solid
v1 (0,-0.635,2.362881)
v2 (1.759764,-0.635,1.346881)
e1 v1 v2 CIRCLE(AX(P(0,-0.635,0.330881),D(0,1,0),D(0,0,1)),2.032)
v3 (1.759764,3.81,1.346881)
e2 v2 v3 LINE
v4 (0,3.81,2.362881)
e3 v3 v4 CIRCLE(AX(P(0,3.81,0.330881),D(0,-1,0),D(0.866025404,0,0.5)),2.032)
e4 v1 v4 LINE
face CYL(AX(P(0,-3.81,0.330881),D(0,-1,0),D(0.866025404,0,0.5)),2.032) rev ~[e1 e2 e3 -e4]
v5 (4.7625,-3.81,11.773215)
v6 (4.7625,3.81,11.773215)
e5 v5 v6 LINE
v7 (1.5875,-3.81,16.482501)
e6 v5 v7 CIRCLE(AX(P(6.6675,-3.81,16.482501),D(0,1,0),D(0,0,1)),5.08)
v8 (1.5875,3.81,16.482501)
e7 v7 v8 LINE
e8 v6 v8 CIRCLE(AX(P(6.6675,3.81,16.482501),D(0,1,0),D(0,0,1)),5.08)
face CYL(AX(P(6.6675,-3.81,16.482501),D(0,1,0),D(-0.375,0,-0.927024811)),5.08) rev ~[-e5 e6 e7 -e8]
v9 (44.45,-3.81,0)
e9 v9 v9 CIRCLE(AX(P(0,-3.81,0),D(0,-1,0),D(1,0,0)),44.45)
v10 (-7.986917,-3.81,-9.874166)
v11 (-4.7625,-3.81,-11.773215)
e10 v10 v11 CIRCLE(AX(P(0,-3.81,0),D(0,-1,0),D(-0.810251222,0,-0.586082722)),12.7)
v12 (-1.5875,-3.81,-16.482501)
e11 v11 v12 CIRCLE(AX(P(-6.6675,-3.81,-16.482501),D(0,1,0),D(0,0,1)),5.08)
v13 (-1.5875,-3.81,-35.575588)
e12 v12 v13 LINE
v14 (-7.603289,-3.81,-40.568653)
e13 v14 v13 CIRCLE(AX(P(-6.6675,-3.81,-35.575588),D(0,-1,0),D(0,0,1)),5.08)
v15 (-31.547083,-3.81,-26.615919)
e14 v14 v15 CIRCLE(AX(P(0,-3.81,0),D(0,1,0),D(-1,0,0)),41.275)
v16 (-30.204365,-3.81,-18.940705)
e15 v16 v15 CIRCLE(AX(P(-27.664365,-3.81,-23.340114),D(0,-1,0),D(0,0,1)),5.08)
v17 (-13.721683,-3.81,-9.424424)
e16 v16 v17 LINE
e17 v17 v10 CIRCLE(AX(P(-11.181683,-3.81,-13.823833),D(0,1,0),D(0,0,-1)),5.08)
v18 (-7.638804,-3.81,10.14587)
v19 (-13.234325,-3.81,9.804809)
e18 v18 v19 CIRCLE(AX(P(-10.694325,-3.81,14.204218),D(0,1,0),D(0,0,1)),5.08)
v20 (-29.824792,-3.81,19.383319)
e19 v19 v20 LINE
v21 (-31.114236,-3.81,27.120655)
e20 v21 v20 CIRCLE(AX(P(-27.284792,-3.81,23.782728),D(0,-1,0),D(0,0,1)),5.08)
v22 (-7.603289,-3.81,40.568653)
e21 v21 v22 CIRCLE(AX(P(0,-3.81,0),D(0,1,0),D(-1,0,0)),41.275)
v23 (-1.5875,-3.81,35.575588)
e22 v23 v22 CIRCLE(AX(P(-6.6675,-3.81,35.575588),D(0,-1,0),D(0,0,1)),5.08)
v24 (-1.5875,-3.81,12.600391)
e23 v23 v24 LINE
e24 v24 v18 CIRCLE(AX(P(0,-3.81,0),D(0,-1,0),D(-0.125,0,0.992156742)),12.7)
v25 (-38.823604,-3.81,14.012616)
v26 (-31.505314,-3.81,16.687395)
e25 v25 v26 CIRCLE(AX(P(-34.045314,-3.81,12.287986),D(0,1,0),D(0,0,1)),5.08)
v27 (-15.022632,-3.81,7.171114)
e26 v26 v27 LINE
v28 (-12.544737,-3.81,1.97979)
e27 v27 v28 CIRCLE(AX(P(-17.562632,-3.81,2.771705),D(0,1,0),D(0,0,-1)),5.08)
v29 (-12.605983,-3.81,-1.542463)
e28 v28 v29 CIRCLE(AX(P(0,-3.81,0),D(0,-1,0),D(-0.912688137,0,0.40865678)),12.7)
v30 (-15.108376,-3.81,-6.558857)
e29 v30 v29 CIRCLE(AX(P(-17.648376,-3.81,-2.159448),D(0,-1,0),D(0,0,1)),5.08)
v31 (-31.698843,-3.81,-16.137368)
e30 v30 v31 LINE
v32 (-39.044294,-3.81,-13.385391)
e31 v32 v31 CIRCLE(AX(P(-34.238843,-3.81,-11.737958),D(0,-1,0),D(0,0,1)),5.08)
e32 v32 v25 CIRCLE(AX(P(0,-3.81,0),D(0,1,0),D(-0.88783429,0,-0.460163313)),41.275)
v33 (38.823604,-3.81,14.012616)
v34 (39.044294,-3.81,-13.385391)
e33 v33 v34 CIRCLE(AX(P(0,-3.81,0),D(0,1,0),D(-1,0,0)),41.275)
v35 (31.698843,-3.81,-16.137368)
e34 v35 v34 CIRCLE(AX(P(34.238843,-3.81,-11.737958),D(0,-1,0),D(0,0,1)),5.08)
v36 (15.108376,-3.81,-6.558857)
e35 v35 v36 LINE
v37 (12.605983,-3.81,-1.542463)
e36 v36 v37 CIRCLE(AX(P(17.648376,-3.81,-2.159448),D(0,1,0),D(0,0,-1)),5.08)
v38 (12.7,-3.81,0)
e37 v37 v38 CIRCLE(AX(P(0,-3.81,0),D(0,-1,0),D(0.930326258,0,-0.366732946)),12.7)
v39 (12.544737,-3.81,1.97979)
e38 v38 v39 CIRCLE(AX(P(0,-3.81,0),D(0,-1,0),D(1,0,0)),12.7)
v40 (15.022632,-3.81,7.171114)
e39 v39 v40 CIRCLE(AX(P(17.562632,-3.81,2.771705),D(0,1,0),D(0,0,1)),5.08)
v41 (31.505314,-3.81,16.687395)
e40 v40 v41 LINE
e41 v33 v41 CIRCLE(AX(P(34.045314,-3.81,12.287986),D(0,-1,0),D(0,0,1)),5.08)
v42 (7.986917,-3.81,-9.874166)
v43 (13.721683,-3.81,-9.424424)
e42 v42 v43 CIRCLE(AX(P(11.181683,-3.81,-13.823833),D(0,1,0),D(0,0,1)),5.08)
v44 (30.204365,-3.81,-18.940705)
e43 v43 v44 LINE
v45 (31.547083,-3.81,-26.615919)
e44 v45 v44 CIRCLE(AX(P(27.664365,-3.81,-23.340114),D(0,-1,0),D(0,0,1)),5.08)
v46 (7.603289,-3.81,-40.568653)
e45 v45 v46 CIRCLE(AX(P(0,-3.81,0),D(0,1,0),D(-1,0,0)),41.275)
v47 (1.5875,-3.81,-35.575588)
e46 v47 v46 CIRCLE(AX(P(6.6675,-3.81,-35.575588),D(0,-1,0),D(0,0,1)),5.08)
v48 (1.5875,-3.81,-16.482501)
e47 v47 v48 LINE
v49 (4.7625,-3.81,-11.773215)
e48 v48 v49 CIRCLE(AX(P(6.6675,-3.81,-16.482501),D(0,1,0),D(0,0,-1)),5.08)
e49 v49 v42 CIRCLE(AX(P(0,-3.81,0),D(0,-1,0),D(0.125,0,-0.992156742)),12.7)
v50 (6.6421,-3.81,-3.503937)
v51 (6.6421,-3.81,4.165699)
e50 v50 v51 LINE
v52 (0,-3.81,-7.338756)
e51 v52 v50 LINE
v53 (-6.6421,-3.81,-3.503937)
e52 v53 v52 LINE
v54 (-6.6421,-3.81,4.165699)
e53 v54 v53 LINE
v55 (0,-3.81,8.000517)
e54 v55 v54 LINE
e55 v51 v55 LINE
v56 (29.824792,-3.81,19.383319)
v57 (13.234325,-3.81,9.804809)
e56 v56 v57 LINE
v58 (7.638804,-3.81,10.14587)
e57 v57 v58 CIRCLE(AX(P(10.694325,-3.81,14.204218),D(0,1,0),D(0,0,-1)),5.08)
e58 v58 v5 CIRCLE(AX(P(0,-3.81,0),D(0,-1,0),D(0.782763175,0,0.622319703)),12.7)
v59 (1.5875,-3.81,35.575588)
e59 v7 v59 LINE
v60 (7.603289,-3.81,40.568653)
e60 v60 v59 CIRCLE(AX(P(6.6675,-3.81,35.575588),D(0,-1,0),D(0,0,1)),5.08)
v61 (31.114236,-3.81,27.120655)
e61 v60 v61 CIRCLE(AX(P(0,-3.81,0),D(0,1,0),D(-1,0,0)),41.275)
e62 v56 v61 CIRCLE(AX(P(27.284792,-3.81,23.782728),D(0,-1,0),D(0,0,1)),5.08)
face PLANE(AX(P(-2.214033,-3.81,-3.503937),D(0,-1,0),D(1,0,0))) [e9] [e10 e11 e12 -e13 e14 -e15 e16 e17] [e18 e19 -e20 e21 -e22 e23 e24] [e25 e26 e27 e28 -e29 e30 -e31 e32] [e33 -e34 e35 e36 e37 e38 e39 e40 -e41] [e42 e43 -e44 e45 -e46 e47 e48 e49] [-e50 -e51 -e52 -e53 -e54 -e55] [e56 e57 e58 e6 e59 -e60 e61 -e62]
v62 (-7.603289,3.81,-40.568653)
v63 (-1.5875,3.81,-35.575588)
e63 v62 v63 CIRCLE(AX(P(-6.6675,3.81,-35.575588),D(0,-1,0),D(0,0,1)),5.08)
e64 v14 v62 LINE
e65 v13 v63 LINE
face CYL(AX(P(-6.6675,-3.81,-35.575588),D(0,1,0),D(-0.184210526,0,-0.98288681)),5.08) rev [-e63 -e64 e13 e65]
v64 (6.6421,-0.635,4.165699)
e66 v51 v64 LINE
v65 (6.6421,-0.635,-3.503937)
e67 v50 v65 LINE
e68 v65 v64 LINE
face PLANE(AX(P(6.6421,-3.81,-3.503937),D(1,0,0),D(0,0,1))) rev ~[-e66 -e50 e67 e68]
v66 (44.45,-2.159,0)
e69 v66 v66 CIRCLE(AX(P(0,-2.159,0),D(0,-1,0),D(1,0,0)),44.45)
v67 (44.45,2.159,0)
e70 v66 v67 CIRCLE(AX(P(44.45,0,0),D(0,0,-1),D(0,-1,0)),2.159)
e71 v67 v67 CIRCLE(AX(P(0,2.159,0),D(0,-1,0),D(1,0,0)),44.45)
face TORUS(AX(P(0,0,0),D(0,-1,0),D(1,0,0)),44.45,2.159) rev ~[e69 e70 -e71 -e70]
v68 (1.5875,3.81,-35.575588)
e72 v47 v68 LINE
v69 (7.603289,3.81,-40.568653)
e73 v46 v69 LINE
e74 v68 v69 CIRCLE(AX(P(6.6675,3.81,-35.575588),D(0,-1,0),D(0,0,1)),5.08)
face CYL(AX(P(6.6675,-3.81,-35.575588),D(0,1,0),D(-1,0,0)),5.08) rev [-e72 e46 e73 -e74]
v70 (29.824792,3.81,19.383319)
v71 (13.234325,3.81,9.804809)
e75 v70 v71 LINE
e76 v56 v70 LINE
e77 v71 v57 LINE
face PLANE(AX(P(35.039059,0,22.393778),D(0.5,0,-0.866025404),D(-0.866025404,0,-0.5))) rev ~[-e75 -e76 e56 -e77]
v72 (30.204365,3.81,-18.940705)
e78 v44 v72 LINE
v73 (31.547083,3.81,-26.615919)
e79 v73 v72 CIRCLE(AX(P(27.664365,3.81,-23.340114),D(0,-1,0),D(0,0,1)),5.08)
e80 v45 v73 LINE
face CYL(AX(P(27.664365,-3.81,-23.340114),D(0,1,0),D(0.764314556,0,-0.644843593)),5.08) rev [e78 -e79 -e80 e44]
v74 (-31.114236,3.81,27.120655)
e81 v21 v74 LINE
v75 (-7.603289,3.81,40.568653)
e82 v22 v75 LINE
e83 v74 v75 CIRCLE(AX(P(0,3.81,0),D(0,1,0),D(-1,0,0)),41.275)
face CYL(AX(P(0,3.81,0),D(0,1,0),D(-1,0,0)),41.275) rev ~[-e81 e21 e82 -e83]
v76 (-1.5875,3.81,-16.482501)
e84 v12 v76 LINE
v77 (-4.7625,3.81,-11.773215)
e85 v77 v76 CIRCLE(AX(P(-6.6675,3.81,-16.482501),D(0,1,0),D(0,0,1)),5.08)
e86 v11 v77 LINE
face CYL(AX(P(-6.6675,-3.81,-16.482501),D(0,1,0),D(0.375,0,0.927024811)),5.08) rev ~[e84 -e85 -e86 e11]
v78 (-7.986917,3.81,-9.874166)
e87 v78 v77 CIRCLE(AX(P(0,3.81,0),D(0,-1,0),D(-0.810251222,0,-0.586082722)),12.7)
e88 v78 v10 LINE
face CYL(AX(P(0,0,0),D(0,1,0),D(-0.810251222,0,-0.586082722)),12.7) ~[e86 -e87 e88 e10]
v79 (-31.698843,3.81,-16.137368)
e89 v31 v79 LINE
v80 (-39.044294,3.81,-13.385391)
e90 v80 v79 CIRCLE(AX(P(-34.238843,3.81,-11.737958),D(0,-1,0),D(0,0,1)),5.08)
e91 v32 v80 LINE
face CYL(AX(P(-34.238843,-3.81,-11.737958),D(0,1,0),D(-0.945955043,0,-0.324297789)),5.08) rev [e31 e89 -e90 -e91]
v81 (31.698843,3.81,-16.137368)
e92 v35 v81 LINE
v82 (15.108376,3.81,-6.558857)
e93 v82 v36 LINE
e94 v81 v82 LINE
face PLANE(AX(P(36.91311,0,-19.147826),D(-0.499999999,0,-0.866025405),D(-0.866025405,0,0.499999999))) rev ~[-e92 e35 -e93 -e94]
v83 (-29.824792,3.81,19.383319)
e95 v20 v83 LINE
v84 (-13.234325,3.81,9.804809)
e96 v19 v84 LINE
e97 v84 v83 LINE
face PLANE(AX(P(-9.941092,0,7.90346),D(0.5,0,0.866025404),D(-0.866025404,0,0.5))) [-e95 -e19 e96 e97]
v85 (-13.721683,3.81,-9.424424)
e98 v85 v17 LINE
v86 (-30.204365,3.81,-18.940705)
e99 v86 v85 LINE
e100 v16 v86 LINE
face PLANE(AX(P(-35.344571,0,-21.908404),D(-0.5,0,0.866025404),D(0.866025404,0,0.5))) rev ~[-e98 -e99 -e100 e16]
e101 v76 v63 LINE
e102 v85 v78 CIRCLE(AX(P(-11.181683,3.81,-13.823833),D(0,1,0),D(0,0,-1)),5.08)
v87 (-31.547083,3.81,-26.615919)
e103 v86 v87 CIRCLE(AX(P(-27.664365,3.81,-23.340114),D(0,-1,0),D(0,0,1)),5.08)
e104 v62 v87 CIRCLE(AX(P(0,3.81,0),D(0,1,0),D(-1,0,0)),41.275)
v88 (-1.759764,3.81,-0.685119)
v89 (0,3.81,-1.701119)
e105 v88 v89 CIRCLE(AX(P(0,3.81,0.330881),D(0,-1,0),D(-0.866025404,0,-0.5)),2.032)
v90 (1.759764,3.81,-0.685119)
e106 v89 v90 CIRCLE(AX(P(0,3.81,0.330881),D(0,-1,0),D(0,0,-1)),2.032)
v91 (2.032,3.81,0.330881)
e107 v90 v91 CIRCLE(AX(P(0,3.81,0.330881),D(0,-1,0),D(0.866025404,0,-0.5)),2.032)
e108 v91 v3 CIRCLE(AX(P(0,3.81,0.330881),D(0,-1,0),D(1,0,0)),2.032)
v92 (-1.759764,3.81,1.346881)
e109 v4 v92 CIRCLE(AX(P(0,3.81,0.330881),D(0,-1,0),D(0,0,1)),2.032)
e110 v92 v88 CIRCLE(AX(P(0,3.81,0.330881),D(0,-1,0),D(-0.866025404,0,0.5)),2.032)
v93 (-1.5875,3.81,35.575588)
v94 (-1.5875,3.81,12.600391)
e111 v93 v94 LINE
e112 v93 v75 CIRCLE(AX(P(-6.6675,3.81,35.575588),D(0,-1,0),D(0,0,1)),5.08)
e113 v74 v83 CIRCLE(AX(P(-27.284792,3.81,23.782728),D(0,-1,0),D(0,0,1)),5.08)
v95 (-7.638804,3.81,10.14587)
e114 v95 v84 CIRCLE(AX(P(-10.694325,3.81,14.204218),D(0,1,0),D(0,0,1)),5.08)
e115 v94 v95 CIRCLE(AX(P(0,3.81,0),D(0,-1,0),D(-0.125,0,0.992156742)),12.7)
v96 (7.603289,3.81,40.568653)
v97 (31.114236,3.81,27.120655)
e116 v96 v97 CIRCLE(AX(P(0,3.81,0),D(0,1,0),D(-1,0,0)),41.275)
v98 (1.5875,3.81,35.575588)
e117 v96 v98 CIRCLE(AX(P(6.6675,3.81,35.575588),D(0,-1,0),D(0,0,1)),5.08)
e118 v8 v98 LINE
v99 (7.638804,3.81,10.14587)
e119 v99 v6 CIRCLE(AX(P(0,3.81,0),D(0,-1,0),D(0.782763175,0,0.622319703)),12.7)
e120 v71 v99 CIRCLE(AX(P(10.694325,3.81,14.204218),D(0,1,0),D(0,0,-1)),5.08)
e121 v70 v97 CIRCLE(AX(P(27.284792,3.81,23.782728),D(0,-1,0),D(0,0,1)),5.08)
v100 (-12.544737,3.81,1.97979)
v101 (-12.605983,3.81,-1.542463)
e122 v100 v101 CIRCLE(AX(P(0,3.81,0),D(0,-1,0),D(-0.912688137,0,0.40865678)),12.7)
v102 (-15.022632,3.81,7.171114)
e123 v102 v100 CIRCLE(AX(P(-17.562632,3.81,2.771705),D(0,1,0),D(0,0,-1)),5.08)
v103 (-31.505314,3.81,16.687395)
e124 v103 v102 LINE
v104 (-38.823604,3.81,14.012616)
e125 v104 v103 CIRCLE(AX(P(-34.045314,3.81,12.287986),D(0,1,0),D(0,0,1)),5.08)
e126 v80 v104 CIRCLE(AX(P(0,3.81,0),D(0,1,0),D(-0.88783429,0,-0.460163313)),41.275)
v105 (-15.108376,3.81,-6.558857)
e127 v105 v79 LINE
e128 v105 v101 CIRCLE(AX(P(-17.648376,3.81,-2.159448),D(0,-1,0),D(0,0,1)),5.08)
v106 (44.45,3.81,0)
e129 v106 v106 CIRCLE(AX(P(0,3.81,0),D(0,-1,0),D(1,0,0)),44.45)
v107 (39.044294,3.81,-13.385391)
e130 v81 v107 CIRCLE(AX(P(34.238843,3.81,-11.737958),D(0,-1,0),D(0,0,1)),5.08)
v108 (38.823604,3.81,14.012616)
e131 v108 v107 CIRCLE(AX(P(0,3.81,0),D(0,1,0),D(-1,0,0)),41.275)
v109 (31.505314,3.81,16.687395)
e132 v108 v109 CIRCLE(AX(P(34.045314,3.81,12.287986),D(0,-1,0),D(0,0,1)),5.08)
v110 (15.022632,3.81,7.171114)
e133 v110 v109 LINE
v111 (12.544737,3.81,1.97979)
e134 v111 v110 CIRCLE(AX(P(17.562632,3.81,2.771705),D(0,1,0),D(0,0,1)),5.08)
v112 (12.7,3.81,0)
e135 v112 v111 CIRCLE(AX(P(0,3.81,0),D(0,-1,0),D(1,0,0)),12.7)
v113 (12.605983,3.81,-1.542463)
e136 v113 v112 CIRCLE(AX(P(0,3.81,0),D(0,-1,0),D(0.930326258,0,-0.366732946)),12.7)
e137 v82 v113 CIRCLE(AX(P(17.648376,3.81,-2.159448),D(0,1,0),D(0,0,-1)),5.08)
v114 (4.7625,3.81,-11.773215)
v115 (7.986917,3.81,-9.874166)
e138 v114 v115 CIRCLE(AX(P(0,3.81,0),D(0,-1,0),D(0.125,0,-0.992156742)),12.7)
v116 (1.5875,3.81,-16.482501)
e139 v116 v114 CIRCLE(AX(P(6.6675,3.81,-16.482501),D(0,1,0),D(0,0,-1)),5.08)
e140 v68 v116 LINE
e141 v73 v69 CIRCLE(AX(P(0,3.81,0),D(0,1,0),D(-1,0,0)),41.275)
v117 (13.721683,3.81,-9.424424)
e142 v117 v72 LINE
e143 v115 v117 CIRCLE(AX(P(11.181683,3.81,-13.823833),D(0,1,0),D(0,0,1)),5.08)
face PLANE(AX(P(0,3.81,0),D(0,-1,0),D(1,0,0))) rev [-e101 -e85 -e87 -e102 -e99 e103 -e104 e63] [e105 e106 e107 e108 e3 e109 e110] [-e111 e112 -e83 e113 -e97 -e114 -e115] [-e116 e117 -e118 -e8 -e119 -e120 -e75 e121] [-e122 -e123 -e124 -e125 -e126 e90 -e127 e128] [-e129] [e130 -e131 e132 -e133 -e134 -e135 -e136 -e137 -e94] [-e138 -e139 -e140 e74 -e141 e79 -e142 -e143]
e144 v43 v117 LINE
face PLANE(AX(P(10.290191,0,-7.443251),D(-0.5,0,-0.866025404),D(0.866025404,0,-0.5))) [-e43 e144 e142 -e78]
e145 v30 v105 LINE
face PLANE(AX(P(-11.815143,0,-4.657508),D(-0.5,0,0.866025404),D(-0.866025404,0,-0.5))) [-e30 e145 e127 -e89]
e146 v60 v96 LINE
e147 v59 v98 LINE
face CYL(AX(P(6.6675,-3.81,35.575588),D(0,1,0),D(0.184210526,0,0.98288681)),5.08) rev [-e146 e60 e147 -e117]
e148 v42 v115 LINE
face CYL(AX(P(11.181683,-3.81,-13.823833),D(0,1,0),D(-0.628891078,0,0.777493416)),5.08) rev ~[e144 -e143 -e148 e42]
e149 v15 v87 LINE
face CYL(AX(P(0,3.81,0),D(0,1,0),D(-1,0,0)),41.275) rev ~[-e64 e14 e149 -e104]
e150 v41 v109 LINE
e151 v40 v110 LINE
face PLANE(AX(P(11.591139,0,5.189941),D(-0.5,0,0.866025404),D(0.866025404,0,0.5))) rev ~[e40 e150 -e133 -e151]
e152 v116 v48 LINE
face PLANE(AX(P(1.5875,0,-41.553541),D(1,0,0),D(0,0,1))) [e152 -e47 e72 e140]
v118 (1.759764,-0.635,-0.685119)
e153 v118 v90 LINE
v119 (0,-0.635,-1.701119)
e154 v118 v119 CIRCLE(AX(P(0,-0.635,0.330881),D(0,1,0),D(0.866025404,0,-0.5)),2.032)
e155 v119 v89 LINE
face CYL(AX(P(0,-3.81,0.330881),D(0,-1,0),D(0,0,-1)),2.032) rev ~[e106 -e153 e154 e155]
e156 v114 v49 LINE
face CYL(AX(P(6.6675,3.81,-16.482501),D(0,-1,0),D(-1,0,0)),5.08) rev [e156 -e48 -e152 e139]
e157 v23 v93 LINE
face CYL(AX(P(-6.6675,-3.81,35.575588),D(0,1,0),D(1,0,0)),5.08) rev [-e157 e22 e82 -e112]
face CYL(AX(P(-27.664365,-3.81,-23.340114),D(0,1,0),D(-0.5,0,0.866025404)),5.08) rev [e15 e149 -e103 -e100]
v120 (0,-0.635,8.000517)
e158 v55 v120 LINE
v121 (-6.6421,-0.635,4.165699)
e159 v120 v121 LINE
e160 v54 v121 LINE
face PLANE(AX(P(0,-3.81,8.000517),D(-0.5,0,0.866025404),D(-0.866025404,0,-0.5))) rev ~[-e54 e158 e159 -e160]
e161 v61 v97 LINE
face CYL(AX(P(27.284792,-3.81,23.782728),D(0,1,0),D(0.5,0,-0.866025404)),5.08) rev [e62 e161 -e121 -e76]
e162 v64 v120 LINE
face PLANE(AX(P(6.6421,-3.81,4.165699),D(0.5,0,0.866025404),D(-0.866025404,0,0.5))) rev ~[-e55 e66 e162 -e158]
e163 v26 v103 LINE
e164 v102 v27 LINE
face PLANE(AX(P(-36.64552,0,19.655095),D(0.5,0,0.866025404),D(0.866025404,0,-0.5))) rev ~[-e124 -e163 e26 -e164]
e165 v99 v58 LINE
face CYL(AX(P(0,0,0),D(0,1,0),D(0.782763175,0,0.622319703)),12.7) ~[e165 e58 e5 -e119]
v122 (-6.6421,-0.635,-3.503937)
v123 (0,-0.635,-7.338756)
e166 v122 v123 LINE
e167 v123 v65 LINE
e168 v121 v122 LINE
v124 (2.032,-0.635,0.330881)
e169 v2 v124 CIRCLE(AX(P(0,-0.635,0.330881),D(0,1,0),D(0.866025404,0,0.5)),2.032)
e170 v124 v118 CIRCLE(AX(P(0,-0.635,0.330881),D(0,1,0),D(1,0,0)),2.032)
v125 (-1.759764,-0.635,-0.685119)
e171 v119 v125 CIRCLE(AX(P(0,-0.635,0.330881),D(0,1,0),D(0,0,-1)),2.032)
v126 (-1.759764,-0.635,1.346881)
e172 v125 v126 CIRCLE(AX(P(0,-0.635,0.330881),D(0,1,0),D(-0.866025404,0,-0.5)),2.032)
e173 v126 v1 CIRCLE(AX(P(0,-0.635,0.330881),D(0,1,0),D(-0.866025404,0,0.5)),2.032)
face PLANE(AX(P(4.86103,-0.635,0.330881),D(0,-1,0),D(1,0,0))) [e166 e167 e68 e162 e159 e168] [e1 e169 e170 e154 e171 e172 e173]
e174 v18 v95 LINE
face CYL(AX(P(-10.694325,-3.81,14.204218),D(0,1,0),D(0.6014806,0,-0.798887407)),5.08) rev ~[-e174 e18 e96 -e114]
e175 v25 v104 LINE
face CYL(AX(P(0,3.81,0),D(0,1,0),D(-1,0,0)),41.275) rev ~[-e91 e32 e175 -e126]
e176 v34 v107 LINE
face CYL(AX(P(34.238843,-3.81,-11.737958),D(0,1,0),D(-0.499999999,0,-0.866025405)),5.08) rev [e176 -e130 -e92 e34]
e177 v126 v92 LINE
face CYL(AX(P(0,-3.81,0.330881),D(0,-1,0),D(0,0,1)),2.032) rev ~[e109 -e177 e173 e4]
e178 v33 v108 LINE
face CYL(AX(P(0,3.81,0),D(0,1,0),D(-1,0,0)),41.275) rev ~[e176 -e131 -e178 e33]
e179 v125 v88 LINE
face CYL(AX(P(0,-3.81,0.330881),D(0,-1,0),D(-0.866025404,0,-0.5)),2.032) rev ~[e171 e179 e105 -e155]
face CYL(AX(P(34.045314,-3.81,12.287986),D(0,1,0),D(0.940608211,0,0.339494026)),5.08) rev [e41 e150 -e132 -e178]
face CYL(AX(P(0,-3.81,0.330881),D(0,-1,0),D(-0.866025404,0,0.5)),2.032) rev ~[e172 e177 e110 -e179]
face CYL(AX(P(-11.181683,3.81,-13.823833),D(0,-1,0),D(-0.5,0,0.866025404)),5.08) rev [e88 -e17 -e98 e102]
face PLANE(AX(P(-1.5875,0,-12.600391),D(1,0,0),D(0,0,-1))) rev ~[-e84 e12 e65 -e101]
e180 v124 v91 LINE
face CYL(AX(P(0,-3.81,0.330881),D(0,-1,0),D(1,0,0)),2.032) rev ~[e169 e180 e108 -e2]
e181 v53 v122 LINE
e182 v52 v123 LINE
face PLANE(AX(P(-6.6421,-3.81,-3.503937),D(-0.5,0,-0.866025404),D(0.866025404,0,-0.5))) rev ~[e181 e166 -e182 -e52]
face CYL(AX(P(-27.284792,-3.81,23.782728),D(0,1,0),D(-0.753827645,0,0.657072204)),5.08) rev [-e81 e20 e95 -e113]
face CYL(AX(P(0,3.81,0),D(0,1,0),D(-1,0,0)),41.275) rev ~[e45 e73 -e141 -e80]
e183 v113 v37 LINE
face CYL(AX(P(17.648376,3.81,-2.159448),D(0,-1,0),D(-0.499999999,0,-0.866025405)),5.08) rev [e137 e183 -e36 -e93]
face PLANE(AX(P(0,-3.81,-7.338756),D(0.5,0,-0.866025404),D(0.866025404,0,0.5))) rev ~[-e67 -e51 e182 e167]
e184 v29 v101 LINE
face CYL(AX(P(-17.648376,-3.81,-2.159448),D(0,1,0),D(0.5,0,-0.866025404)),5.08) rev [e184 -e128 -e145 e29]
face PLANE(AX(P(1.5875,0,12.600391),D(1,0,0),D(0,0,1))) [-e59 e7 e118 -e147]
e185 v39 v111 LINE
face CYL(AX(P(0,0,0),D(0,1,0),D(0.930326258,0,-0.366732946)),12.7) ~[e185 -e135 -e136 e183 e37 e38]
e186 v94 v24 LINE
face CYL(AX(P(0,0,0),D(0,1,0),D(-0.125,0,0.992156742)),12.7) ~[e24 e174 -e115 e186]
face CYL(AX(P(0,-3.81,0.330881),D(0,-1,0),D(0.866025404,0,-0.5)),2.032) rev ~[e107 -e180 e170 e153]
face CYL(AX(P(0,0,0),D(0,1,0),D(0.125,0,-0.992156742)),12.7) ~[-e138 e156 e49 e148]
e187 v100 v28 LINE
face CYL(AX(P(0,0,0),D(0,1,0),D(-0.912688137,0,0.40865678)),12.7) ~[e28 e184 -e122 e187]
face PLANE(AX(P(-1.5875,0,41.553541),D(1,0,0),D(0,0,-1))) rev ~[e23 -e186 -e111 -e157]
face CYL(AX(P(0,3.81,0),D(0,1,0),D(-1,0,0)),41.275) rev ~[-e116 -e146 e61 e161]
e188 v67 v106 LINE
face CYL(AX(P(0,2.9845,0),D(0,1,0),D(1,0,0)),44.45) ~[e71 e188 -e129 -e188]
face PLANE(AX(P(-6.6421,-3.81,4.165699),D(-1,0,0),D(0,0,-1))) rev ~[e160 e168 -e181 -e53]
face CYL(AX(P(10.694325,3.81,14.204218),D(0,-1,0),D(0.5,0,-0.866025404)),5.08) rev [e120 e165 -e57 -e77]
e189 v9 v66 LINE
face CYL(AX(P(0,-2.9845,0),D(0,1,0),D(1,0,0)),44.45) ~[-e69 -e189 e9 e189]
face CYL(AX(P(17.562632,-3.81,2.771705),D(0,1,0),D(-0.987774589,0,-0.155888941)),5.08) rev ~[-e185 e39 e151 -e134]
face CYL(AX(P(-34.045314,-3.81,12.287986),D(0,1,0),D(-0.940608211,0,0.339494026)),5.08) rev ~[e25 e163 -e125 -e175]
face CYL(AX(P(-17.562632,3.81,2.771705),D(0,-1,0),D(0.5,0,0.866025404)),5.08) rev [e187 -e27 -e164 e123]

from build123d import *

# Parameters (mm, degrees)
F0_W      = 44.45
F0_H      = 1.651
F2_R      = 41.275
F3_DEPTH  = 7.621
F5_DEPTH  = 3.81
F6_DEPTH  = 3.81
F7_DEPTH  = 3.81
F9_DEPTH  = 3.175
F10_DEPTH = 7.621
F11_R     = 5.08


# Not quite as in the source:
# - two fillets or chamfers of one size are made in one step
# - ends of sketch curves that miss each other by under 0.0002 mm in the source are joined
# - a feature names something its author has since deleted; it is built from what else it names


with BuildPart() as f1:
    # F0 (on Top) → F1 (revolve)
    with BuildSketch(Plane.XY):
        with Locations((22.225, 2.9845)):
            Rectangle(F0_W, F0_H)
        with Locations((22.225, -2.9845)):
            Rectangle(F0_W, F0_H)
        with BuildLine():
            Line((0, 2.159), (0, 0))
            Line((0, 0), (0, -2.159))
            Line((0, -2.159), (44.45, -2.159))
            ThreePointArc((44.45, -2.159), (42.291, 0), (44.45, 2.159))
            Line((44.45, 2.159), (0, 2.159))
        make_face()
    revolve(axis=Axis((0, -1.905, 0), (0, -1, 0)))

    # F2 (on face) → F3 (cut, through all)
    with BuildSketch(Plane(origin=(0, 3.81, 0), x_dir=(-1, 0, 0), z_dir=(0, 1, 0))):
        Circle(F2_R)
    extrude(amount=-F3_DEPTH, mode=Mode.SUBTRACT)

    # F4 (on Front) → F5 (join, symmetric)
    with BuildSketch(Plane.XZ):
        with BuildLine():
            ThreePointArc((9.9410923172, 7.9034602258), (10.4172850275, 7.2643081333), (10.85244705, 6.5965440214))
            Line((10.85244705, 6.5965440214), (35.8685432444, 21.0395938934))
            ThreePointArc((35.8685432444, 21.0395938934), (35.4602658033, 21.72064582), (35.0390585298, 22.3937777747))
            Line((35.0390585298, 22.3937777747), (9.9410923172, 7.9034602258))
        make_face()
        with BuildLine():
            Line((35.8685432444, 21.0395938934), (10.85244705, 6.5965440214))
            ThreePointArc((10.85244705, 6.5965440214), (11.2438105409, 5.9048052059), (11.5911393429, 5.1899411109))
            Line((11.5911393429, 5.1899411109), (36.6455202991, 19.6550947004))
            ThreePointArc((36.6455202991, 19.6550947004), (36.263639674, 20.351052633), (35.8685432444, 21.0395938934))
        make_face()
        with BuildLine():
            Line((0, 41.583853906), (0, 12.7))
            ThreePointArc((0, 12.7), (0.7953109893, 12.6750731923), (1.5875, 12.6003906189))
            Line((1.5875, 12.6003906189), (1.5875, 41.5535407568))
            ThreePointArc((1.5875, 41.5535407568), (0.7938946934, 41.576274928), (0, 41.583853906))
        make_face()
        with BuildLine():
            ThreePointArc((-1.5875, 12.6003906189), (-0.7953109893, 12.6750731923), (0, 12.7))
            Line((0, 12.7), (0, 41.583853906))
            ThreePointArc((0, 41.583853906), (-0.7938946934, 41.576274928), (-1.5875, 41.5535407568))
            Line((-1.5875, 41.5535407568), (-1.5875, 12.6003906189))
        make_face()
        with BuildLine():
            Line((-35.8685432444, 21.0395938934), (-10.85244705, 6.5965440214))
            ThreePointArc((-10.85244705, 6.5965440214), (-10.4172850275, 7.2643081333), (-9.9410923172, 7.9034602258))
            Line((-9.9410923172, 7.9034602258), (-35.0390585298, 22.3937777747))
            ThreePointArc((-35.0390585298, 22.3937777747), (-35.4602658033, 21.72064582), (-35.8685432444, 21.0395938934))
        make_face()
        with BuildLine():
            ThreePointArc((-11.5911393429, 5.1899411109), (-11.2438105409, 5.9048052059), (-10.85244705, 6.5965440214))
            Line((-10.85244705, 6.5965440214), (-35.8685432444, 21.0395938934))
            ThreePointArc((-35.8685432444, 21.0395938934), (-36.263639674, 20.351052633), (-36.6455202991, 19.6550947004))
            Line((-36.6455202991, 19.6550947004), (-11.5911393429, 5.1899411109))
        make_face()
        with BuildLine():
            Line((-36.1550944192, -20.5432726997), (-11.1389982248, -6.1002228278))
            ThreePointArc((-11.1389982248, -6.1002228278), (-11.4997178981, -5.3894794057), (-11.8151434919, -4.6575083752))
            Line((-11.8151434919, -4.6575083752), (-36.9131097045, -19.1478259241))
            ThreePointArc((-36.9131097045, -19.1478259241), (-36.5407639684, -19.8491681006), (-36.1550944192, -20.5432726997))
        make_face()
        with BuildLine():
            ThreePointArc((-10.2901905176, -7.4432505743), (-10.7356165832, -6.7850229608), (-11.1389982248, -6.1002228278))
            Line((-11.1389982248, -6.1002228278), (-36.1550944192, -20.5432726997))
            ThreePointArc((-36.1550944192, -20.5432726997), (-35.7563484109, -21.2297068748), (-35.3445714739, -21.9084041638))
            Line((-35.3445714739, -21.9084041638), (-10.2901905176, -7.4432505743))
        make_face()
        with BuildLine():
            Line((36.1550944192, -20.5432726997), (11.1389982248, -6.1002228278))
            ThreePointArc((11.1389982248, -6.1002228278), (10.7356165832, -6.7850229608), (10.2901905176, -7.4432505743))
            Line((10.2901905176, -7.4432505743), (35.3445714739, -21.9084041638))
            ThreePointArc((35.3445714739, -21.9084041638), (35.7563484109, -21.2297068748), (36.1550944192, -20.5432726997))
        make_face()
        with BuildLine():
            ThreePointArc((11.8151434743, -4.6575084199), (11.4997178879, -5.3894794275), (11.1389982248, -6.1002228278))
            Line((11.1389982248, -6.1002228278), (36.1550944192, -20.5432726997))
            ThreePointArc((36.1550944192, -20.5432726997), (36.5407639684, -19.8491681006), (36.9131097045, -19.1478259241))
            Line((36.9131097045, -19.1478259241), (11.8151434743, -4.6575084199))
        make_face()
        with BuildLine():
            ThreePointArc((1.5875, -12.6003906189), (0.7953109893, -12.6750731923), (0, -12.7))
            Line((0, -12.7), (0, -41.583853906))
            ThreePointArc((0, -41.583853906), (0.7938946934, -41.576274928), (1.5875, -41.5535407568))
            Line((1.5875, -41.5535407568), (1.5875, -12.6003906189))
        make_face()
        with BuildLine():
            Line((0, -41.583853906), (0, -12.7))
            ThreePointArc((0, -12.7), (-0.7953109893, -12.6750731923), (-1.5875, -12.6003906189))
            Line((-1.5875, -12.6003906189), (-1.5875, -41.5535407568))
            ThreePointArc((-1.5875, -41.5535407568), (-0.7938946934, -41.576274928), (0, -41.583853906))
        make_face()
    extrude(amount=F5_DEPTH, both=True)

    # F4 (on Front) → F6 (join, symmetric)
    with BuildSketch(Plane.XZ):
        with BuildLine():
            Line((10.85244705, 6.5965440214), (8.3535925717, 5.1538297157))
            ThreePointArc((8.3535925717, 5.1538297157), (9.4429693471, 2.6785816216), (9.8155218706, 0))
            ThreePointArc((9.8155218706, 0), (9.5171421524, -2.4017649436), (8.640143746, -4.6575085229))
            Line((8.6401437743, -4.6575085382), (11.1389982248, -6.1002228278))
            ThreePointArc((11.1389982248, -6.1002228278), (11.4997178879, -5.3894794275), (11.8151434743, -4.6575084199))
            ThreePointArc((11.8151434743, -4.6575084199), (12.4768249592, -2.3704090234), (12.7, 0))
            ThreePointArc((12.7, 0), (12.4196914143, 2.6535382366), (11.5911393429, 5.1899411109))
            ThreePointArc((11.5911393429, 5.1899411109), (11.2438105409, 5.9048052059), (10.85244705, 6.5965440214))
        make_face()
        with BuildLine():
            Line((0, 12.7), (0, 9.8155218706))
            ThreePointArc((0, 9.8155218706), (4.7831444313, 8.5712308884), (8.3535925717, 5.1538297157))
            Line((8.3535925717, 5.1538297157), (10.85244705, 6.5965440214))
            ThreePointArc((10.85244705, 6.5965440214), (10.4172850275, 7.2643081333), (9.9410923172, 7.9034602258))
            ThreePointArc((9.9410923172, 7.9034602258), (6.2243392407, 11.0701219965), (1.5875, 12.6003906189))
            ThreePointArc((1.5875, 12.6003906189), (0.7953109893, 12.6750731923), (0, 12.7))
        make_face()
        with BuildLine():
            Line((-10.85244705, 6.5965440214), (-8.3535925717, 5.1538297157))
            ThreePointArc((-8.3535925717, 5.1538297157), (-4.7831444313, 8.5712308884), (0, 9.8155218706))
            Line((0, 9.8155218706), (0, 12.7))
            ThreePointArc((0, 12.7), (-0.7953109893, 12.6750731923), (-1.5875, 12.6003906189))
            ThreePointArc((-1.5875, 12.6003906189), (-6.2243392407, 11.0701219965), (-9.9410923172, 7.9034602258))
            ThreePointArc((-9.9410923172, 7.9034602258), (-10.4172850275, 7.2643081333), (-10.85244705, 6.5965440214))
        make_face()
        with BuildLine():
            ThreePointArc((-8.6401437465, -4.6575085221), (-9.8113382378, 0.2865511747), (-8.3535925717, 5.1538297157))
            Line((-8.3535925717, 5.1538297157), (-10.85244705, 6.5965440214))
            ThreePointArc((-10.85244705, 6.5965440214), (-11.2438105409, 5.9048052059), (-11.5911393429, 5.1899411109))
            ThreePointArc((-11.5911393429, 5.1899411109), (-12.6967154958, 0.2888176228), (-11.8151434919, -4.6575083752))
            ThreePointArc((-11.8151434919, -4.6575083752), (-11.4997178981, -5.3894794057), (-11.1389982248, -6.1002228278))
            Line((-11.1389982248, -6.1002228278), (-8.6401437465, -4.6575085221))
        make_face()
        with BuildLine():
            ThreePointArc((0, -9.8155218706), (-5.0313314754, -8.4279400316), (-8.6401437465, -4.6575085221))
            Line((-8.6401437465, -4.6575085221), (-11.1389982248, -6.1002228278))
            ThreePointArc((-11.1389982248, -6.1002228278), (-10.7356165832, -6.7850229608), (-10.2901905176, -7.4432505743))
            ThreePointArc((-10.2901905176, -7.4432505743), (-6.4744811659, -10.9257079236), (-1.5875, -12.6003906189))
            ThreePointArc((-1.5875, -12.6003906189), (-0.7953109893, -12.6750731923), (0, -12.7))
            Line((0, -12.7), (0, -9.8155218706))
        make_face()
        with BuildLine():
            ThreePointArc((8.640143746, -4.6575085229), (5.031331475, -8.4279400319), (0, -9.8155218706))
            Line((0, -9.8155218706), (0, -12.7))
            ThreePointArc((0, -12.7), (0.7953109893, -12.6750731923), (1.5875, -12.6003906189))
            ThreePointArc((1.5875, -12.6003906189), (6.4744811659, -10.9257079236), (10.2901905176, -7.4432505743))
            ThreePointArc((10.2901905176, -7.4432505743), (10.7356165832, -6.7850229608), (11.1389982248, -6.1002228278))
            Line((11.1389982248, -6.1002228278), (8.6401437743, -4.6575085382))
        make_face()
        with BuildLine():
            Line((8.3535925717, 5.1538297157), (6.6421, 4.1656990187))
            Line((6.6421, 4.1656990187), (6.6421, -3.5039374272))
            Line((6.6421, -3.5039374272), (8.6401437743, -4.6575085382))
            ThreePointArc((8.640143746, -4.6575085229), (9.5171421524, -2.4017649436), (9.8155218706, 0))
            ThreePointArc((9.8155218706, 0), (9.4429693471, 2.6785816216), (8.3535925717, 5.1538297157))
        make_face()
        with BuildLine():
            Line((6.6421, -3.5039374272), (0, -7.3387556502))
            Line((0, -7.3387556502), (0, -9.8155218706))
            ThreePointArc((0, -9.8155218706), (5.031331475, -8.4279400319), (8.640143746, -4.6575085229))
            Line((8.6401437743, -4.6575085382), (6.6421, -3.5039374272))
        make_face()
        with BuildLine():
            Line((0, -7.3387556502), (-6.6421, -3.5039374272))
            Line((-6.6421, -3.5039374272), (-8.6401437465, -4.6575085221))
            ThreePointArc((-8.6401437465, -4.6575085221), (-5.0313314754, -8.4279400316), (0, -9.8155218706))
            Line((0, -9.8155218706), (0, -7.3387556502))
        make_face()
        with BuildLine():
            Line((-6.6421, -3.5039374272), (-6.6421, 4.1656990187))
            Line((-6.6421, 4.1656990187), (-8.3535925717, 5.1538297157))
            ThreePointArc((-8.3535925717, 5.1538297157), (-9.8113382378, 0.2865511747), (-8.6401437465, -4.6575085221))
            Line((-8.6401437465, -4.6575085221), (-6.6421, -3.5039374272))
        make_face()
        with BuildLine():
            Line((-8.3535925717, 5.1538297157), (-6.6421, 4.1656990187))
            Line((-6.6421, 4.1656990187), (0, 8.0005172417))
            Line((0, 8.0005172417), (0, 9.8155218706))
            ThreePointArc((0, 9.8155218706), (-4.7831444313, 8.5712308884), (-8.3535925717, 5.1538297157))
        make_face()
        with BuildLine():
            Line((0, 9.8155218706), (0, 8.0005172417))
            Line((0, 8.0005172417), (6.6421, 4.1656990187))
            Line((6.6421, 4.1656990187), (8.3535925717, 5.1538297157))
            ThreePointArc((8.3535925717, 5.1538297157), (4.7831444313, 8.5712308884), (0, 9.8155218706))
        make_face()
    extrude(amount=F6_DEPTH, both=True)

    # F4 (on Front) → F7 (join, symmetric)
    with BuildSketch(Plane.XZ):
        Polygon((0, 0.3308807958), (-6.6421, -3.5039374272), (0, -7.3387556502), align=None)
        Polygon((0, 0.3308807958), (-6.6421, 4.1656990187), (-6.6421, -3.5039374272), align=None)
        Polygon((0, 8.0005172417), (-6.6421, 4.1656990187), (0, 0.3308807958), align=None)
        Polygon((6.6421, 4.1656990187), (0, 8.0005172417), (0, 0.3308807958), align=None)
        Polygon((6.6421, 4.1656990187), (0, 0.3308807958), (6.6421, -3.5039374272), align=None)
        Polygon((6.6421, -3.5039374272), (0, 0.3308807958), (0, -7.3387556502), align=None)
    extrude(amount=F7_DEPTH, both=True)

    # F8 (on face) → F9 (cut)
    with BuildSketch(Plane.XZ.offset(3.81)):
        with BuildLine():
            Line((6.6421, -3.5039374272), (6.6421, 4.1656990187))
            Line((6.6421, 4.1656990187), (1.7597636205, 1.3468807958))
            ThreePointArc((1.7597636205, 1.3468807958), (1.962761279, 0.8568010954), (2.032, 0.3308807958))
            ThreePointArc((2.032, 0.3308807958), (1.962761279, -0.1950395039), (1.7597636205, -0.6851192042))
            Line((1.7597636205, -0.6851192042), (6.6421, -3.5039374272))
        make_face()
        with BuildLine():
            Line((0, -1.7011192042), (0, -7.3387556502))
            Line((0, -7.3387556502), (6.6421, -3.5039374272))
            Line((6.6421, -3.5039374272), (1.7597636205, -0.6851192042))
            ThreePointArc((1.7597636205, -0.6851192042), (1.016, -1.4288828247), (0, -1.7011192042))
        make_face()
        with BuildLine():
            Line((-1.7597636205, -0.6851192042), (-6.6421, -3.5039374272))
            Line((-6.6421, -3.5039374272), (0, -7.3387556502))
            Line((0, -7.3387556502), (0, -1.7011192042))
            ThreePointArc((0, -1.7011192042), (-1.016, -1.4288828247), (-1.7597636205, -0.6851192042))
        make_face()
        with BuildLine():
            Line((-1.7597636205, 1.3468807958), (-6.6421, 4.1656990187))
            Line((-6.6421, 4.1656990187), (-6.6421, -3.5039374272))
            Line((-6.6421, -3.5039374272), (-1.7597636205, -0.6851192042))
            ThreePointArc((-1.7597636205, -0.6851192042), (-2.032, 0.3308807958), (-1.7597636205, 1.3468807958))
        make_face()
        with BuildLine():
            Line((0, 8.0005172417), (-6.6421, 4.1656990187))
            Line((-6.6421, 4.1656990187), (-1.7597636205, 1.3468807958))
            ThreePointArc((-1.7597636205, 1.3468807958), (-1.016, 2.0906444162), (0, 2.3628807958))
            Line((0, 2.3628807958), (0, 8.0005172417))
        make_face()
        with BuildLine():
            Line((6.6421, 4.1656990187), (0, 8.0005172417))
            Line((0, 8.0005172417), (0, 2.3628807958))
            ThreePointArc((0, 2.3628807958), (1.016, 2.0906444162), (1.7597636205, 1.3468807958))
            Line((1.7597636205, 1.3468807958), (6.6421, 4.1656990187))
        make_face()
    extrude(amount=-F9_DEPTH, mode=Mode.SUBTRACT)

    # F8 (on face) → F10 (cut, through all)
    with BuildSketch(Plane.XZ.offset(3.81)):
        with BuildLine():
            Line((0, -1.7011192042), (0, 0.3308807958))
            Line((0, 0.3308807958), (-1.7597636205, -0.6851192042))
            ThreePointArc((-1.7597636205, -0.6851192042), (-1.016, -1.4288828247), (0, -1.7011192042))
        make_face()
        with BuildLine():
            Line((0, 0.3308807958), (-1.7597636205, 1.3468807958))
            ThreePointArc((-1.7597636205, 1.3468807958), (-2.032, 0.3308807958), (-1.7597636205, -0.6851192042))
            Line((-1.7597636205, -0.6851192042), (0, 0.3308807958))
        make_face()
        with BuildLine():
            ThreePointArc((0, 2.3628807958), (-1.016, 2.0906444162), (-1.7597636205, 1.3468807958))
            Line((-1.7597636205, 1.3468807958), (0, 0.3308807958))
            Line((0, 0.3308807958), (0, 2.3628807958))
        make_face()
        with BuildLine():
            ThreePointArc((1.7597636205, 1.3468807958), (1.016, 2.0906444162), (0, 2.3628807958))
            Line((0, 2.3628807958), (0, 0.3308807958))
            Line((0, 0.3308807958), (1.7597636205, 1.3468807958))
        make_face()
        with BuildLine():
            Line((1.7597636205, 1.3468807958), (0, 0.3308807958))
            Line((0, 0.3308807958), (1.7597636205, -0.6851192042))
            ThreePointArc((1.7597636205, -0.6851192042), (1.962761279, -0.1950395039), (2.032, 0.3308807958))
            ThreePointArc((2.032, 0.3308807958), (1.962761279, 0.8568010954), (1.7597636205, 1.3468807958))
        make_face()
        with BuildLine():
            Line((1.7597636205, -0.6851192042), (0, 0.3308807958))
            Line((0, 0.3308807958), (0, -1.7011192042))
            ThreePointArc((0, -1.7011192042), (1.016, -1.4288828247), (1.7597636205, -0.6851192042))
        make_face()
    extrude(amount=-F10_DEPTH, mode=Mode.SUBTRACT)

    # F11
    f11_edges = [f1.edges().sort_by_distance(p)[0] for p in [
        (1.5875, 0, -41.24446),
        (-1.5875, 0, -41.24446),
        (36.64536, 0, -18.993241),
        (35.076964, 0, -21.753901),
        (34.771309, 0, 22.239193),
        (36.377913, 0, 19.500592),
        (-1.5875, 0, 41.24446),
        (-9.941092, 0, 7.90346),
        (-34.771309, 0, 22.239193),
        (-11.591139, 0, 5.189941),
        (-11.815143, 0, -4.657508),
        (-36.377913, 0, 19.500592),
        (-36.64536, 0, -18.993241),
        (1.5875, 0, 12.600391),
        (1.5875, 0, 41.24446),
        (9.941092, 0, 7.90346),
        (11.591139, 0, 5.189941),
        (11.815143, 0, -4.657508),
        (-1.5875, 0, -12.600391),
        (-10.290191, 0, -7.443251),
        (-35.076964, 0, -21.753901),
        (10.290191, 0, -7.443251),
        (1.5875, 0, -12.600391),
    ]]
    fillet(f11_edges, radius=F11_R)


solid = f1.part
